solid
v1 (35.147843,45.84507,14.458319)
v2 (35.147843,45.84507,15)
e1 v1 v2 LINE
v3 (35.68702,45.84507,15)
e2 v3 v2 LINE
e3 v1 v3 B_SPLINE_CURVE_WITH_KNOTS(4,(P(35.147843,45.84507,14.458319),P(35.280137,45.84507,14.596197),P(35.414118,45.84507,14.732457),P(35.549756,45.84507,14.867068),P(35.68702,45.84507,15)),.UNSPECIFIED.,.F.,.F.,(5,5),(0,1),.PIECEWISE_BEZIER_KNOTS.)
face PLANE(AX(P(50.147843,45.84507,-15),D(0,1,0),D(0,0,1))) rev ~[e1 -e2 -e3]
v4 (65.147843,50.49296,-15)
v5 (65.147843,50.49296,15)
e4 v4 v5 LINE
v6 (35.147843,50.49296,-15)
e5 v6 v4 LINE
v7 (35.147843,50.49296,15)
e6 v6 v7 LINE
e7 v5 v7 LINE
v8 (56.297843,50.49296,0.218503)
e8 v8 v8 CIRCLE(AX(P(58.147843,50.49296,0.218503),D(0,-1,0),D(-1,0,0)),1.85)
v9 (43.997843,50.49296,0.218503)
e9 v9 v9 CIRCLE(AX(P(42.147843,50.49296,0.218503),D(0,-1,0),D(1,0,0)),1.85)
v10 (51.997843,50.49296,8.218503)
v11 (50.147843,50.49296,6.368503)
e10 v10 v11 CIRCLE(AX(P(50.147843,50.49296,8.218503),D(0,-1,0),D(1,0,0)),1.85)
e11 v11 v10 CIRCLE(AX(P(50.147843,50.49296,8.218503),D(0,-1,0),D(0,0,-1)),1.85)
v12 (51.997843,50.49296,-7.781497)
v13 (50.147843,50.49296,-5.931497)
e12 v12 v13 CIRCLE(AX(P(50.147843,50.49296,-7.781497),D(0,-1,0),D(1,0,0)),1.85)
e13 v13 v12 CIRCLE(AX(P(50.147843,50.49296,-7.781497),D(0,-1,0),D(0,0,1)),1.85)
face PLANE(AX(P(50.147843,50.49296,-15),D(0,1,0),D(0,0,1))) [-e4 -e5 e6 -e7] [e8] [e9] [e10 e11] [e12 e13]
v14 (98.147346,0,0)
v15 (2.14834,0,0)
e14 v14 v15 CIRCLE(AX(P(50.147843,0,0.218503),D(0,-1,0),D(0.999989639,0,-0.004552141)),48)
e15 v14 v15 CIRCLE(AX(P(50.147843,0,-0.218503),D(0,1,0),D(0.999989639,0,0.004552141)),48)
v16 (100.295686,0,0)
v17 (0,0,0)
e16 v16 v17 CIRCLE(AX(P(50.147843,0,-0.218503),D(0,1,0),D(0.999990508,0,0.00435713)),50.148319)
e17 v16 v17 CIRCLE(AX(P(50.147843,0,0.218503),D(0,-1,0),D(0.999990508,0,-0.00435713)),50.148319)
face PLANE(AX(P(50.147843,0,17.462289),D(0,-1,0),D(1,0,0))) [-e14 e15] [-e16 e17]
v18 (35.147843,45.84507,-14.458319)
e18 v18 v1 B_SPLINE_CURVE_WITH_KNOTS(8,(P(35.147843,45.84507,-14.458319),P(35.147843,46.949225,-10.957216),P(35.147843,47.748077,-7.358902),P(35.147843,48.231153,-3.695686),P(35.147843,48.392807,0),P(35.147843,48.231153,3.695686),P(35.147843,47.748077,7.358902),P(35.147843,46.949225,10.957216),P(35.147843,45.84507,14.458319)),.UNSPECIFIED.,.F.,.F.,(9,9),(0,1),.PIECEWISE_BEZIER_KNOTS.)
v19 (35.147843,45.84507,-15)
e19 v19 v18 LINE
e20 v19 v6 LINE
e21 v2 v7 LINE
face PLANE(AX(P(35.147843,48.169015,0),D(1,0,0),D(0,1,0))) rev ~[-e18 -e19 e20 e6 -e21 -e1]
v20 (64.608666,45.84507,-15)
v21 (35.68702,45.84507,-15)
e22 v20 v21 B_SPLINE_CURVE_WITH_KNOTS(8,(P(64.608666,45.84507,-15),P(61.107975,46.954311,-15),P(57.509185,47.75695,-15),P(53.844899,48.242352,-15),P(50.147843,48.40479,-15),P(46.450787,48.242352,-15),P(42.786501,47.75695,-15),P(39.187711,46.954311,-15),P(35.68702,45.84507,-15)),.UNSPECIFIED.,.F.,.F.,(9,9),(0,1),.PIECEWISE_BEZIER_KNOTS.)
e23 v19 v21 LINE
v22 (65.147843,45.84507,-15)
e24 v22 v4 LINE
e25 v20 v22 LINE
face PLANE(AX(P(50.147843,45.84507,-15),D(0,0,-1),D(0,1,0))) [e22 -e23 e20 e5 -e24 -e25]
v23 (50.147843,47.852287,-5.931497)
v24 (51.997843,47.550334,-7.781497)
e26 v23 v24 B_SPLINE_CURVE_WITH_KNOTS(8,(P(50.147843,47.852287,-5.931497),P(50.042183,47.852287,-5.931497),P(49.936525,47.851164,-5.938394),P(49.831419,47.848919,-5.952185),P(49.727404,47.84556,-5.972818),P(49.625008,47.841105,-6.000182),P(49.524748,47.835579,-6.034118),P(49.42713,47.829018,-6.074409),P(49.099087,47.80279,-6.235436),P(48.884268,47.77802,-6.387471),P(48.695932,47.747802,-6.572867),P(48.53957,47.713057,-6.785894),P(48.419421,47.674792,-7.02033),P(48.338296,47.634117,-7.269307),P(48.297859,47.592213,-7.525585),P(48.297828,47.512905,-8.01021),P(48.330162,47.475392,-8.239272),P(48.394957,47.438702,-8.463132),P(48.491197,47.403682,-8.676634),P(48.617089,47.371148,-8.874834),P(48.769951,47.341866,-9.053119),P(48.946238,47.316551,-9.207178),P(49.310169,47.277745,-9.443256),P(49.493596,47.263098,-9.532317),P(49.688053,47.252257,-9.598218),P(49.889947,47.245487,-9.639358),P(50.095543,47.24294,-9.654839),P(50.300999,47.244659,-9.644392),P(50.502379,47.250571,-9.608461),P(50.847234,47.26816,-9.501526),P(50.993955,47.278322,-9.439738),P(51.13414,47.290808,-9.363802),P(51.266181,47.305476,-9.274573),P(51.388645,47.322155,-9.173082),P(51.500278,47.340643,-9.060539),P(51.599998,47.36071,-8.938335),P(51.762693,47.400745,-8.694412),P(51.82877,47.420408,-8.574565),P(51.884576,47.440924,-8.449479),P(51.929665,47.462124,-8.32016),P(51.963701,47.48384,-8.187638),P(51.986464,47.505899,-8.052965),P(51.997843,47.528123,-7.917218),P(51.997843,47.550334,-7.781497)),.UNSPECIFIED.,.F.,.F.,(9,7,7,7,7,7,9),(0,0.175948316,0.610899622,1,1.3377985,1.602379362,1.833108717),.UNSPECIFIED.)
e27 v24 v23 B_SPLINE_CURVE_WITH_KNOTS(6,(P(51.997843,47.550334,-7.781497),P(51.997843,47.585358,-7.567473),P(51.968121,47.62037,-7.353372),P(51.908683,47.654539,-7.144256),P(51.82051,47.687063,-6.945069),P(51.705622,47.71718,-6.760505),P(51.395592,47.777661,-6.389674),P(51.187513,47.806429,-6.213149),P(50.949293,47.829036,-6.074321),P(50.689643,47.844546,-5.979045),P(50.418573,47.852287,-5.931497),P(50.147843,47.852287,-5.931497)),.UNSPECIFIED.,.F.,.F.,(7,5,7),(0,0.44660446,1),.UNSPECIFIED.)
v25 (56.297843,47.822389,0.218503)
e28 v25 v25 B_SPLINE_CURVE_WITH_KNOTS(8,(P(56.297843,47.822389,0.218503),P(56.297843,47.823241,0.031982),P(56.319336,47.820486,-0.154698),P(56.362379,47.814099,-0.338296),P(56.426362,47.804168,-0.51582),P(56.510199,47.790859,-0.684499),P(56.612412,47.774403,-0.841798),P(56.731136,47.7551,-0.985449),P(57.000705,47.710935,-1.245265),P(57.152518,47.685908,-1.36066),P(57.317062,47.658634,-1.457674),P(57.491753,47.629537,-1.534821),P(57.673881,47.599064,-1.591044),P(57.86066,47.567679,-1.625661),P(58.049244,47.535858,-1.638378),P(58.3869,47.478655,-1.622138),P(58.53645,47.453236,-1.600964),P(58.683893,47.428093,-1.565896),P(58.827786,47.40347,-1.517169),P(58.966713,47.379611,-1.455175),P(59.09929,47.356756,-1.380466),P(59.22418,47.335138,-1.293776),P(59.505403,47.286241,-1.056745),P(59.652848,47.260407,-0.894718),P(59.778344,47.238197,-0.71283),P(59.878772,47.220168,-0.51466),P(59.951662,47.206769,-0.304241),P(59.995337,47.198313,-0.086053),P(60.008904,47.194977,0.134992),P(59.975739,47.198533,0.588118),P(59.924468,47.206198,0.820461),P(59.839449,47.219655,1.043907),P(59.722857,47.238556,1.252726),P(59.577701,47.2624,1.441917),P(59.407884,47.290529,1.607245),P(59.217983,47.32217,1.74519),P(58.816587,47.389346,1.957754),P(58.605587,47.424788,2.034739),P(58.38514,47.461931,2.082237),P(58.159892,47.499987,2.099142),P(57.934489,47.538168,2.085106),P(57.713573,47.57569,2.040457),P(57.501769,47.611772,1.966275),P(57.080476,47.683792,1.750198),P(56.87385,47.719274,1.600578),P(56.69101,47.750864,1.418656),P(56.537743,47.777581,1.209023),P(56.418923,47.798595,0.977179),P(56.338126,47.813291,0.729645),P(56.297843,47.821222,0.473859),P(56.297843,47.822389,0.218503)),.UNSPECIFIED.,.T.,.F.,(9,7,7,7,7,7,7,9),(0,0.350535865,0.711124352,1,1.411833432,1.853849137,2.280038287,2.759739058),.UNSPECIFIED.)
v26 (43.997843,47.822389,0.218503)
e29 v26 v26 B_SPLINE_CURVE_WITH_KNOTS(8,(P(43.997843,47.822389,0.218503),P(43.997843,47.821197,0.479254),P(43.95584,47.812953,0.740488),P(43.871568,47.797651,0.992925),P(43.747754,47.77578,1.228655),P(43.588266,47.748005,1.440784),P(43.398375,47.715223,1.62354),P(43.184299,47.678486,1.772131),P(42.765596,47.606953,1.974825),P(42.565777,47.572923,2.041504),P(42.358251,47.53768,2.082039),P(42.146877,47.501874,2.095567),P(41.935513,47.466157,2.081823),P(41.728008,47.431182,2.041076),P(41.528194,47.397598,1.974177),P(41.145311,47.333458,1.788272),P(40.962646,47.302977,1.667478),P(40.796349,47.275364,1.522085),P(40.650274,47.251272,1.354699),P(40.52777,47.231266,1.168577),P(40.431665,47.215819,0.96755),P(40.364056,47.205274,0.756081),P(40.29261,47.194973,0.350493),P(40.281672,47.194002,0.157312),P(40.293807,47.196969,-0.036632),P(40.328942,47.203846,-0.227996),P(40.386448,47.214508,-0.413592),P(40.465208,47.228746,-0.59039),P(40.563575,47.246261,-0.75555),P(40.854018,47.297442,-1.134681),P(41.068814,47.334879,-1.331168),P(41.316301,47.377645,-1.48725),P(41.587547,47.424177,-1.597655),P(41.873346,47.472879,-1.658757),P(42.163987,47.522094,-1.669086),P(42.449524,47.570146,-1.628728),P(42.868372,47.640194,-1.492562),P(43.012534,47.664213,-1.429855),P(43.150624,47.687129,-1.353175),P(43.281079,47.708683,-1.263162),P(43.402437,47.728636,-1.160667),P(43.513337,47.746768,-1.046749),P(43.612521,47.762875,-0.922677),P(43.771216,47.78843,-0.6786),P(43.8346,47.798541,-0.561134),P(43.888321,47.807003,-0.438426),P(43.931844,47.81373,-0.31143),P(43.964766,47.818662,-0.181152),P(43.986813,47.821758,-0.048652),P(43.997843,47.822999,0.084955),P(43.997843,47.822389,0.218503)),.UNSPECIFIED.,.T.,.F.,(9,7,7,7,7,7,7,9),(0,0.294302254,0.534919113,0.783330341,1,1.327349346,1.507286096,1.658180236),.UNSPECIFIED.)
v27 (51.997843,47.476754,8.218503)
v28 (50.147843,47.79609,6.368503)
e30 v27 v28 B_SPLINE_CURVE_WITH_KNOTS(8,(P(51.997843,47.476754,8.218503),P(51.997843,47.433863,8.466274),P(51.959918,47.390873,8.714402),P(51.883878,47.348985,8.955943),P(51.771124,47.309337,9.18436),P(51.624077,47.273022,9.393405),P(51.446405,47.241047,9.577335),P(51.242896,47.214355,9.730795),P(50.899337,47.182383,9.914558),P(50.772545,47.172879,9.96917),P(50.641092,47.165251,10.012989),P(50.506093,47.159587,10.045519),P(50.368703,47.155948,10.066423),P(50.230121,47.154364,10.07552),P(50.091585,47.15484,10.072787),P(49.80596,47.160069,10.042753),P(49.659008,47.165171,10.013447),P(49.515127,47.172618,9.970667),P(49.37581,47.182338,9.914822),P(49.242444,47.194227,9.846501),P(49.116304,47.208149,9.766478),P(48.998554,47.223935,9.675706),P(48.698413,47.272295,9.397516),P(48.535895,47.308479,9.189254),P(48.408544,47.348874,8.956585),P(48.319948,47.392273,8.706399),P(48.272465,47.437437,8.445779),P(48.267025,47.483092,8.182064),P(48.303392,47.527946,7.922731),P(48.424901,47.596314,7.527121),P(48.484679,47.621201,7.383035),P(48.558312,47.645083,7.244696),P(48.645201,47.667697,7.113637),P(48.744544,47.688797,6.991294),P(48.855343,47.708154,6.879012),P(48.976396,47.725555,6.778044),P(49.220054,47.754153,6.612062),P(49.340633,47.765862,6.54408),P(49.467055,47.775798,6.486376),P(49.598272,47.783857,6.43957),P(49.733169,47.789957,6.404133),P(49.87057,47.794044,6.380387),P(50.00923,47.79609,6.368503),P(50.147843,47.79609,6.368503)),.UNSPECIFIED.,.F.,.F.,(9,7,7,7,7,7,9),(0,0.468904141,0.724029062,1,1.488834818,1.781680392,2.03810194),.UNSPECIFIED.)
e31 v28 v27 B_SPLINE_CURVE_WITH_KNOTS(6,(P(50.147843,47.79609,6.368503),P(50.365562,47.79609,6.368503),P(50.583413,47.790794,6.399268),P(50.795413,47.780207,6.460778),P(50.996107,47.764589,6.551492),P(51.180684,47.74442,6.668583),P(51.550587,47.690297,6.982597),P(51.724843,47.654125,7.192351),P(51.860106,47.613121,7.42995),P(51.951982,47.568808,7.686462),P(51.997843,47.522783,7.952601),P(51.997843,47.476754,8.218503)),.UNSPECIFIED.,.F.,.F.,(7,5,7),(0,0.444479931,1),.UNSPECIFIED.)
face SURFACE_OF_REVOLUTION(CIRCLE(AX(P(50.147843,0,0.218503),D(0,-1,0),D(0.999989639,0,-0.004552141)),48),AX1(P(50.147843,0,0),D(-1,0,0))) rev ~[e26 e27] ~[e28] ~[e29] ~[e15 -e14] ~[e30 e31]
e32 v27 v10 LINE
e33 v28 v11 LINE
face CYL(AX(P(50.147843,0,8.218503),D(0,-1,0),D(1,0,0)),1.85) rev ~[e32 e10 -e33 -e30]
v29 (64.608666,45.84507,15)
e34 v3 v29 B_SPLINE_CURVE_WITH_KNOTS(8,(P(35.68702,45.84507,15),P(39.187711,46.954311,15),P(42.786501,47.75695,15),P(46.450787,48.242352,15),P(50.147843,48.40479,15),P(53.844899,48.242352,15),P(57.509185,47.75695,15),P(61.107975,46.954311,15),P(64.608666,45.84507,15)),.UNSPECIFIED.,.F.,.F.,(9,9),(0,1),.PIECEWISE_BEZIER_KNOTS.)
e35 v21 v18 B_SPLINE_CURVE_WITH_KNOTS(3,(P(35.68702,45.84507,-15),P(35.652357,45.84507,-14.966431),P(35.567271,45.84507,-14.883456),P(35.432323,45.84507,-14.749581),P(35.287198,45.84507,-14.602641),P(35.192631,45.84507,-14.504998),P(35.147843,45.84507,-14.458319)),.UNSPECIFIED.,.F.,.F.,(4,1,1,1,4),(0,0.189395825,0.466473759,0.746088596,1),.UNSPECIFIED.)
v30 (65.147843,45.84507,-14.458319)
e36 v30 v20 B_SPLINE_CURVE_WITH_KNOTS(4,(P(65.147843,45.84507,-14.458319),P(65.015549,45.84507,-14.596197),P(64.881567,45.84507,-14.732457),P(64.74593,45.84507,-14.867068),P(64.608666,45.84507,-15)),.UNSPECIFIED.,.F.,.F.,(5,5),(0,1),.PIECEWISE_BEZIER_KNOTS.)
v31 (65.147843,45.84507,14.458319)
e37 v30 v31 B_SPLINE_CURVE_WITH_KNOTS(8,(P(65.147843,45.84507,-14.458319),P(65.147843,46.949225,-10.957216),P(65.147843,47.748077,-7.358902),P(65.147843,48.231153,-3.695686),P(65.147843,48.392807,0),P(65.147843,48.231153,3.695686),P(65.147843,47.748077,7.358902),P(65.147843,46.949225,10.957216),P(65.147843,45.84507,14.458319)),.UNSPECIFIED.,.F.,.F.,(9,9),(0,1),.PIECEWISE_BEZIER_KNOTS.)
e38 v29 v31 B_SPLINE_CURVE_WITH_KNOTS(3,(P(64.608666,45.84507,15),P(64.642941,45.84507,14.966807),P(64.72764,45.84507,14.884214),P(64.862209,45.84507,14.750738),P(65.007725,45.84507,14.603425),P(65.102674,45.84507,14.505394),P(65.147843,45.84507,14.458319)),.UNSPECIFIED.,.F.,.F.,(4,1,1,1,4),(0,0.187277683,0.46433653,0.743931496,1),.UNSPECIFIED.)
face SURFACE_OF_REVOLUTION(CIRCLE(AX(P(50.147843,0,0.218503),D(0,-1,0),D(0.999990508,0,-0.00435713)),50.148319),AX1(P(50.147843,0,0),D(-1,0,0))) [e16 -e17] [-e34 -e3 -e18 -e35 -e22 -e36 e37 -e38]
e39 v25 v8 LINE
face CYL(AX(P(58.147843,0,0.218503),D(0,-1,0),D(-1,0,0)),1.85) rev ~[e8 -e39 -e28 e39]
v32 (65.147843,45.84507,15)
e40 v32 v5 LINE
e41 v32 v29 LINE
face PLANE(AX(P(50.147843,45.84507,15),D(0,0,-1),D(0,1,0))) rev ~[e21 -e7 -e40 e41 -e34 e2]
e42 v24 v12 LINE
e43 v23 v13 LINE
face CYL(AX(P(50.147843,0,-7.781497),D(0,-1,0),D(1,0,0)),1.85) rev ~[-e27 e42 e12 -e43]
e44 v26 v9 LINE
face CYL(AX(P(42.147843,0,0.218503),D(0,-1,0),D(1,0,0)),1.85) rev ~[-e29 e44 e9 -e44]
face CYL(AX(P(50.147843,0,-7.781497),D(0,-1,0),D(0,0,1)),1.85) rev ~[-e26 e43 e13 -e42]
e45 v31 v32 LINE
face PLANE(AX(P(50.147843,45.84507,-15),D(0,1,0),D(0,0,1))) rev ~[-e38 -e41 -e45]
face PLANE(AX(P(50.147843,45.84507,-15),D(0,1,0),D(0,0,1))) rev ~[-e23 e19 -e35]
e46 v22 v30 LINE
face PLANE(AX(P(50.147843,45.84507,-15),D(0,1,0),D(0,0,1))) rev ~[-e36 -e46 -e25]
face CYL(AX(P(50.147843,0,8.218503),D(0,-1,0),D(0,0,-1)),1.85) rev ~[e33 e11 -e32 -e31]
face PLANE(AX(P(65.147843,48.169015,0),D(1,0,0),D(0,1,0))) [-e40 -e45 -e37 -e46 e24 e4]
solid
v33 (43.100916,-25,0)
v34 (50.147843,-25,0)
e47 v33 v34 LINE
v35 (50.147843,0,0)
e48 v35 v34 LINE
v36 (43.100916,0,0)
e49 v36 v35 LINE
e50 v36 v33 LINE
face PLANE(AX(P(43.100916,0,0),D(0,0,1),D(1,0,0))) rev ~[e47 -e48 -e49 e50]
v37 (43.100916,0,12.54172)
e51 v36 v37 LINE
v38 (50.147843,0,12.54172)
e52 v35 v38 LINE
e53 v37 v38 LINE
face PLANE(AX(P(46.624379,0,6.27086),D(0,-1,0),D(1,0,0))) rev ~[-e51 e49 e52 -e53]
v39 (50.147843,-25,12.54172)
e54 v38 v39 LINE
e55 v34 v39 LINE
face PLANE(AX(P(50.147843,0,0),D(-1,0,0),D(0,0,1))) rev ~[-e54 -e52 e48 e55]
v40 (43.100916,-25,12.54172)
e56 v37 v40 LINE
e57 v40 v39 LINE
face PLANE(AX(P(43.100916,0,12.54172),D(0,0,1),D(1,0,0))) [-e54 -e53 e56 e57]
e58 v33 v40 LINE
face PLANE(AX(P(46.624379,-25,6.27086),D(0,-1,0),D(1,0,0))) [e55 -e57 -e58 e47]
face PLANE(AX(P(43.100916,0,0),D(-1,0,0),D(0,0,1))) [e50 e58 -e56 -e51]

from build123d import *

# Parameters (mm, degrees)
F1_ANGLE = 180
F3_W     = 7.0469270903
F3_H     = 12.5417197123
F4_DEPTH = 25
F5_W     = 4.6478901516
F5_H     = 30
F6_DEPTH = 15
F7_ANGLE = 180
F8_R     = 1.85
F9_DEPTH = 60


# Not quite as in the source:
# - a feature names something its author has since deleted; it is built from what else it names


with BuildPart() as f1:
    # F0 (on Front) → F1 (revolve)
    with BuildSketch(Plane.XZ):
        with BuildLine():
            Line((0, 0), (100.295685879, 0))
            ThreePointArc((100.295685879, 0), (50.1478429395, 50.366821709), (0, 0))
        make_face()
    revolve(axis=Axis((50.1478429395, 0, 0), (-1, 0, 0)), revolution_arc=F1_ANGLE)

    # F5 (on face) → F6 (join, symmetric)
    with BuildSketch(Plane.YZ.offset(50.1478429395)):
        with Locations((48.1690146605, 0)):
            Rectangle(F5_W, F5_H)
    extrude(amount=F6_DEPTH, both=True)

    # F2 (on Front) → F7 (revolve, cut)
    with BuildSketch(Plane.XZ):
        with BuildLine():
            Line((2.1483402697, 0), (98.1473456093, 0))
            ThreePointArc((98.1473456093, 0), (50.1478429395, 48.2185027448), (2.1483402697, 0))
        make_face()
    revolve(axis=Axis((50.1478429395, 0, 0), (-1, 0, 0)), revolution_arc=F7_ANGLE, mode=Mode.SUBTRACT)

    # F8 (on Front) → F9 (cut)
    with BuildSketch(Plane.XZ):
        with BuildLine():
            ThreePointArc((51.9978429395, 8.2185027448), (48.8396953943, 9.52665029), (50.1478429395, 6.3685027448))
            ThreePointArc((50.1478429395, 6.3685027448), (51.4559904847, 6.9103551996), (51.9978429395, 8.2185027448))
        make_face()
        with Locations((42.1478429395, 0.2185027448)):
            Circle(F8_R)
        with BuildLine():
            ThreePointArc((59.9978429395, 0.2185027448), (58.1478429395, 2.0685027448), (56.2978429395, 0.2185027448))
            ThreePointArc((56.2978429395, 0.2185027448), (58.1478429395, -1.6314972552), (59.9978429395, 0.2185027448))
        make_face()
        with BuildLine():
            ThreePointArc((51.9978429395, -7.7814972552), (51.4559904847, -6.47334971), (50.1478429395, -5.9314972552))
            ThreePointArc((50.1478429395, -5.9314972552), (48.8396953943, -9.0896448004), (51.9978429395, -7.7814972552))
        make_face()
    extrude(amount=-F9_DEPTH, mode=Mode.SUBTRACT)


with BuildPart() as f4:
    # F3 (on Front) → F4 (new body)
    with BuildSketch(Plane.XZ):
        with Locations((46.6243793944, 6.2708598562)):
            Rectangle(F3_W, F3_H)
    extrude(amount=F4_DEPTH)


solid = Compound([f1.part, f4.part])
